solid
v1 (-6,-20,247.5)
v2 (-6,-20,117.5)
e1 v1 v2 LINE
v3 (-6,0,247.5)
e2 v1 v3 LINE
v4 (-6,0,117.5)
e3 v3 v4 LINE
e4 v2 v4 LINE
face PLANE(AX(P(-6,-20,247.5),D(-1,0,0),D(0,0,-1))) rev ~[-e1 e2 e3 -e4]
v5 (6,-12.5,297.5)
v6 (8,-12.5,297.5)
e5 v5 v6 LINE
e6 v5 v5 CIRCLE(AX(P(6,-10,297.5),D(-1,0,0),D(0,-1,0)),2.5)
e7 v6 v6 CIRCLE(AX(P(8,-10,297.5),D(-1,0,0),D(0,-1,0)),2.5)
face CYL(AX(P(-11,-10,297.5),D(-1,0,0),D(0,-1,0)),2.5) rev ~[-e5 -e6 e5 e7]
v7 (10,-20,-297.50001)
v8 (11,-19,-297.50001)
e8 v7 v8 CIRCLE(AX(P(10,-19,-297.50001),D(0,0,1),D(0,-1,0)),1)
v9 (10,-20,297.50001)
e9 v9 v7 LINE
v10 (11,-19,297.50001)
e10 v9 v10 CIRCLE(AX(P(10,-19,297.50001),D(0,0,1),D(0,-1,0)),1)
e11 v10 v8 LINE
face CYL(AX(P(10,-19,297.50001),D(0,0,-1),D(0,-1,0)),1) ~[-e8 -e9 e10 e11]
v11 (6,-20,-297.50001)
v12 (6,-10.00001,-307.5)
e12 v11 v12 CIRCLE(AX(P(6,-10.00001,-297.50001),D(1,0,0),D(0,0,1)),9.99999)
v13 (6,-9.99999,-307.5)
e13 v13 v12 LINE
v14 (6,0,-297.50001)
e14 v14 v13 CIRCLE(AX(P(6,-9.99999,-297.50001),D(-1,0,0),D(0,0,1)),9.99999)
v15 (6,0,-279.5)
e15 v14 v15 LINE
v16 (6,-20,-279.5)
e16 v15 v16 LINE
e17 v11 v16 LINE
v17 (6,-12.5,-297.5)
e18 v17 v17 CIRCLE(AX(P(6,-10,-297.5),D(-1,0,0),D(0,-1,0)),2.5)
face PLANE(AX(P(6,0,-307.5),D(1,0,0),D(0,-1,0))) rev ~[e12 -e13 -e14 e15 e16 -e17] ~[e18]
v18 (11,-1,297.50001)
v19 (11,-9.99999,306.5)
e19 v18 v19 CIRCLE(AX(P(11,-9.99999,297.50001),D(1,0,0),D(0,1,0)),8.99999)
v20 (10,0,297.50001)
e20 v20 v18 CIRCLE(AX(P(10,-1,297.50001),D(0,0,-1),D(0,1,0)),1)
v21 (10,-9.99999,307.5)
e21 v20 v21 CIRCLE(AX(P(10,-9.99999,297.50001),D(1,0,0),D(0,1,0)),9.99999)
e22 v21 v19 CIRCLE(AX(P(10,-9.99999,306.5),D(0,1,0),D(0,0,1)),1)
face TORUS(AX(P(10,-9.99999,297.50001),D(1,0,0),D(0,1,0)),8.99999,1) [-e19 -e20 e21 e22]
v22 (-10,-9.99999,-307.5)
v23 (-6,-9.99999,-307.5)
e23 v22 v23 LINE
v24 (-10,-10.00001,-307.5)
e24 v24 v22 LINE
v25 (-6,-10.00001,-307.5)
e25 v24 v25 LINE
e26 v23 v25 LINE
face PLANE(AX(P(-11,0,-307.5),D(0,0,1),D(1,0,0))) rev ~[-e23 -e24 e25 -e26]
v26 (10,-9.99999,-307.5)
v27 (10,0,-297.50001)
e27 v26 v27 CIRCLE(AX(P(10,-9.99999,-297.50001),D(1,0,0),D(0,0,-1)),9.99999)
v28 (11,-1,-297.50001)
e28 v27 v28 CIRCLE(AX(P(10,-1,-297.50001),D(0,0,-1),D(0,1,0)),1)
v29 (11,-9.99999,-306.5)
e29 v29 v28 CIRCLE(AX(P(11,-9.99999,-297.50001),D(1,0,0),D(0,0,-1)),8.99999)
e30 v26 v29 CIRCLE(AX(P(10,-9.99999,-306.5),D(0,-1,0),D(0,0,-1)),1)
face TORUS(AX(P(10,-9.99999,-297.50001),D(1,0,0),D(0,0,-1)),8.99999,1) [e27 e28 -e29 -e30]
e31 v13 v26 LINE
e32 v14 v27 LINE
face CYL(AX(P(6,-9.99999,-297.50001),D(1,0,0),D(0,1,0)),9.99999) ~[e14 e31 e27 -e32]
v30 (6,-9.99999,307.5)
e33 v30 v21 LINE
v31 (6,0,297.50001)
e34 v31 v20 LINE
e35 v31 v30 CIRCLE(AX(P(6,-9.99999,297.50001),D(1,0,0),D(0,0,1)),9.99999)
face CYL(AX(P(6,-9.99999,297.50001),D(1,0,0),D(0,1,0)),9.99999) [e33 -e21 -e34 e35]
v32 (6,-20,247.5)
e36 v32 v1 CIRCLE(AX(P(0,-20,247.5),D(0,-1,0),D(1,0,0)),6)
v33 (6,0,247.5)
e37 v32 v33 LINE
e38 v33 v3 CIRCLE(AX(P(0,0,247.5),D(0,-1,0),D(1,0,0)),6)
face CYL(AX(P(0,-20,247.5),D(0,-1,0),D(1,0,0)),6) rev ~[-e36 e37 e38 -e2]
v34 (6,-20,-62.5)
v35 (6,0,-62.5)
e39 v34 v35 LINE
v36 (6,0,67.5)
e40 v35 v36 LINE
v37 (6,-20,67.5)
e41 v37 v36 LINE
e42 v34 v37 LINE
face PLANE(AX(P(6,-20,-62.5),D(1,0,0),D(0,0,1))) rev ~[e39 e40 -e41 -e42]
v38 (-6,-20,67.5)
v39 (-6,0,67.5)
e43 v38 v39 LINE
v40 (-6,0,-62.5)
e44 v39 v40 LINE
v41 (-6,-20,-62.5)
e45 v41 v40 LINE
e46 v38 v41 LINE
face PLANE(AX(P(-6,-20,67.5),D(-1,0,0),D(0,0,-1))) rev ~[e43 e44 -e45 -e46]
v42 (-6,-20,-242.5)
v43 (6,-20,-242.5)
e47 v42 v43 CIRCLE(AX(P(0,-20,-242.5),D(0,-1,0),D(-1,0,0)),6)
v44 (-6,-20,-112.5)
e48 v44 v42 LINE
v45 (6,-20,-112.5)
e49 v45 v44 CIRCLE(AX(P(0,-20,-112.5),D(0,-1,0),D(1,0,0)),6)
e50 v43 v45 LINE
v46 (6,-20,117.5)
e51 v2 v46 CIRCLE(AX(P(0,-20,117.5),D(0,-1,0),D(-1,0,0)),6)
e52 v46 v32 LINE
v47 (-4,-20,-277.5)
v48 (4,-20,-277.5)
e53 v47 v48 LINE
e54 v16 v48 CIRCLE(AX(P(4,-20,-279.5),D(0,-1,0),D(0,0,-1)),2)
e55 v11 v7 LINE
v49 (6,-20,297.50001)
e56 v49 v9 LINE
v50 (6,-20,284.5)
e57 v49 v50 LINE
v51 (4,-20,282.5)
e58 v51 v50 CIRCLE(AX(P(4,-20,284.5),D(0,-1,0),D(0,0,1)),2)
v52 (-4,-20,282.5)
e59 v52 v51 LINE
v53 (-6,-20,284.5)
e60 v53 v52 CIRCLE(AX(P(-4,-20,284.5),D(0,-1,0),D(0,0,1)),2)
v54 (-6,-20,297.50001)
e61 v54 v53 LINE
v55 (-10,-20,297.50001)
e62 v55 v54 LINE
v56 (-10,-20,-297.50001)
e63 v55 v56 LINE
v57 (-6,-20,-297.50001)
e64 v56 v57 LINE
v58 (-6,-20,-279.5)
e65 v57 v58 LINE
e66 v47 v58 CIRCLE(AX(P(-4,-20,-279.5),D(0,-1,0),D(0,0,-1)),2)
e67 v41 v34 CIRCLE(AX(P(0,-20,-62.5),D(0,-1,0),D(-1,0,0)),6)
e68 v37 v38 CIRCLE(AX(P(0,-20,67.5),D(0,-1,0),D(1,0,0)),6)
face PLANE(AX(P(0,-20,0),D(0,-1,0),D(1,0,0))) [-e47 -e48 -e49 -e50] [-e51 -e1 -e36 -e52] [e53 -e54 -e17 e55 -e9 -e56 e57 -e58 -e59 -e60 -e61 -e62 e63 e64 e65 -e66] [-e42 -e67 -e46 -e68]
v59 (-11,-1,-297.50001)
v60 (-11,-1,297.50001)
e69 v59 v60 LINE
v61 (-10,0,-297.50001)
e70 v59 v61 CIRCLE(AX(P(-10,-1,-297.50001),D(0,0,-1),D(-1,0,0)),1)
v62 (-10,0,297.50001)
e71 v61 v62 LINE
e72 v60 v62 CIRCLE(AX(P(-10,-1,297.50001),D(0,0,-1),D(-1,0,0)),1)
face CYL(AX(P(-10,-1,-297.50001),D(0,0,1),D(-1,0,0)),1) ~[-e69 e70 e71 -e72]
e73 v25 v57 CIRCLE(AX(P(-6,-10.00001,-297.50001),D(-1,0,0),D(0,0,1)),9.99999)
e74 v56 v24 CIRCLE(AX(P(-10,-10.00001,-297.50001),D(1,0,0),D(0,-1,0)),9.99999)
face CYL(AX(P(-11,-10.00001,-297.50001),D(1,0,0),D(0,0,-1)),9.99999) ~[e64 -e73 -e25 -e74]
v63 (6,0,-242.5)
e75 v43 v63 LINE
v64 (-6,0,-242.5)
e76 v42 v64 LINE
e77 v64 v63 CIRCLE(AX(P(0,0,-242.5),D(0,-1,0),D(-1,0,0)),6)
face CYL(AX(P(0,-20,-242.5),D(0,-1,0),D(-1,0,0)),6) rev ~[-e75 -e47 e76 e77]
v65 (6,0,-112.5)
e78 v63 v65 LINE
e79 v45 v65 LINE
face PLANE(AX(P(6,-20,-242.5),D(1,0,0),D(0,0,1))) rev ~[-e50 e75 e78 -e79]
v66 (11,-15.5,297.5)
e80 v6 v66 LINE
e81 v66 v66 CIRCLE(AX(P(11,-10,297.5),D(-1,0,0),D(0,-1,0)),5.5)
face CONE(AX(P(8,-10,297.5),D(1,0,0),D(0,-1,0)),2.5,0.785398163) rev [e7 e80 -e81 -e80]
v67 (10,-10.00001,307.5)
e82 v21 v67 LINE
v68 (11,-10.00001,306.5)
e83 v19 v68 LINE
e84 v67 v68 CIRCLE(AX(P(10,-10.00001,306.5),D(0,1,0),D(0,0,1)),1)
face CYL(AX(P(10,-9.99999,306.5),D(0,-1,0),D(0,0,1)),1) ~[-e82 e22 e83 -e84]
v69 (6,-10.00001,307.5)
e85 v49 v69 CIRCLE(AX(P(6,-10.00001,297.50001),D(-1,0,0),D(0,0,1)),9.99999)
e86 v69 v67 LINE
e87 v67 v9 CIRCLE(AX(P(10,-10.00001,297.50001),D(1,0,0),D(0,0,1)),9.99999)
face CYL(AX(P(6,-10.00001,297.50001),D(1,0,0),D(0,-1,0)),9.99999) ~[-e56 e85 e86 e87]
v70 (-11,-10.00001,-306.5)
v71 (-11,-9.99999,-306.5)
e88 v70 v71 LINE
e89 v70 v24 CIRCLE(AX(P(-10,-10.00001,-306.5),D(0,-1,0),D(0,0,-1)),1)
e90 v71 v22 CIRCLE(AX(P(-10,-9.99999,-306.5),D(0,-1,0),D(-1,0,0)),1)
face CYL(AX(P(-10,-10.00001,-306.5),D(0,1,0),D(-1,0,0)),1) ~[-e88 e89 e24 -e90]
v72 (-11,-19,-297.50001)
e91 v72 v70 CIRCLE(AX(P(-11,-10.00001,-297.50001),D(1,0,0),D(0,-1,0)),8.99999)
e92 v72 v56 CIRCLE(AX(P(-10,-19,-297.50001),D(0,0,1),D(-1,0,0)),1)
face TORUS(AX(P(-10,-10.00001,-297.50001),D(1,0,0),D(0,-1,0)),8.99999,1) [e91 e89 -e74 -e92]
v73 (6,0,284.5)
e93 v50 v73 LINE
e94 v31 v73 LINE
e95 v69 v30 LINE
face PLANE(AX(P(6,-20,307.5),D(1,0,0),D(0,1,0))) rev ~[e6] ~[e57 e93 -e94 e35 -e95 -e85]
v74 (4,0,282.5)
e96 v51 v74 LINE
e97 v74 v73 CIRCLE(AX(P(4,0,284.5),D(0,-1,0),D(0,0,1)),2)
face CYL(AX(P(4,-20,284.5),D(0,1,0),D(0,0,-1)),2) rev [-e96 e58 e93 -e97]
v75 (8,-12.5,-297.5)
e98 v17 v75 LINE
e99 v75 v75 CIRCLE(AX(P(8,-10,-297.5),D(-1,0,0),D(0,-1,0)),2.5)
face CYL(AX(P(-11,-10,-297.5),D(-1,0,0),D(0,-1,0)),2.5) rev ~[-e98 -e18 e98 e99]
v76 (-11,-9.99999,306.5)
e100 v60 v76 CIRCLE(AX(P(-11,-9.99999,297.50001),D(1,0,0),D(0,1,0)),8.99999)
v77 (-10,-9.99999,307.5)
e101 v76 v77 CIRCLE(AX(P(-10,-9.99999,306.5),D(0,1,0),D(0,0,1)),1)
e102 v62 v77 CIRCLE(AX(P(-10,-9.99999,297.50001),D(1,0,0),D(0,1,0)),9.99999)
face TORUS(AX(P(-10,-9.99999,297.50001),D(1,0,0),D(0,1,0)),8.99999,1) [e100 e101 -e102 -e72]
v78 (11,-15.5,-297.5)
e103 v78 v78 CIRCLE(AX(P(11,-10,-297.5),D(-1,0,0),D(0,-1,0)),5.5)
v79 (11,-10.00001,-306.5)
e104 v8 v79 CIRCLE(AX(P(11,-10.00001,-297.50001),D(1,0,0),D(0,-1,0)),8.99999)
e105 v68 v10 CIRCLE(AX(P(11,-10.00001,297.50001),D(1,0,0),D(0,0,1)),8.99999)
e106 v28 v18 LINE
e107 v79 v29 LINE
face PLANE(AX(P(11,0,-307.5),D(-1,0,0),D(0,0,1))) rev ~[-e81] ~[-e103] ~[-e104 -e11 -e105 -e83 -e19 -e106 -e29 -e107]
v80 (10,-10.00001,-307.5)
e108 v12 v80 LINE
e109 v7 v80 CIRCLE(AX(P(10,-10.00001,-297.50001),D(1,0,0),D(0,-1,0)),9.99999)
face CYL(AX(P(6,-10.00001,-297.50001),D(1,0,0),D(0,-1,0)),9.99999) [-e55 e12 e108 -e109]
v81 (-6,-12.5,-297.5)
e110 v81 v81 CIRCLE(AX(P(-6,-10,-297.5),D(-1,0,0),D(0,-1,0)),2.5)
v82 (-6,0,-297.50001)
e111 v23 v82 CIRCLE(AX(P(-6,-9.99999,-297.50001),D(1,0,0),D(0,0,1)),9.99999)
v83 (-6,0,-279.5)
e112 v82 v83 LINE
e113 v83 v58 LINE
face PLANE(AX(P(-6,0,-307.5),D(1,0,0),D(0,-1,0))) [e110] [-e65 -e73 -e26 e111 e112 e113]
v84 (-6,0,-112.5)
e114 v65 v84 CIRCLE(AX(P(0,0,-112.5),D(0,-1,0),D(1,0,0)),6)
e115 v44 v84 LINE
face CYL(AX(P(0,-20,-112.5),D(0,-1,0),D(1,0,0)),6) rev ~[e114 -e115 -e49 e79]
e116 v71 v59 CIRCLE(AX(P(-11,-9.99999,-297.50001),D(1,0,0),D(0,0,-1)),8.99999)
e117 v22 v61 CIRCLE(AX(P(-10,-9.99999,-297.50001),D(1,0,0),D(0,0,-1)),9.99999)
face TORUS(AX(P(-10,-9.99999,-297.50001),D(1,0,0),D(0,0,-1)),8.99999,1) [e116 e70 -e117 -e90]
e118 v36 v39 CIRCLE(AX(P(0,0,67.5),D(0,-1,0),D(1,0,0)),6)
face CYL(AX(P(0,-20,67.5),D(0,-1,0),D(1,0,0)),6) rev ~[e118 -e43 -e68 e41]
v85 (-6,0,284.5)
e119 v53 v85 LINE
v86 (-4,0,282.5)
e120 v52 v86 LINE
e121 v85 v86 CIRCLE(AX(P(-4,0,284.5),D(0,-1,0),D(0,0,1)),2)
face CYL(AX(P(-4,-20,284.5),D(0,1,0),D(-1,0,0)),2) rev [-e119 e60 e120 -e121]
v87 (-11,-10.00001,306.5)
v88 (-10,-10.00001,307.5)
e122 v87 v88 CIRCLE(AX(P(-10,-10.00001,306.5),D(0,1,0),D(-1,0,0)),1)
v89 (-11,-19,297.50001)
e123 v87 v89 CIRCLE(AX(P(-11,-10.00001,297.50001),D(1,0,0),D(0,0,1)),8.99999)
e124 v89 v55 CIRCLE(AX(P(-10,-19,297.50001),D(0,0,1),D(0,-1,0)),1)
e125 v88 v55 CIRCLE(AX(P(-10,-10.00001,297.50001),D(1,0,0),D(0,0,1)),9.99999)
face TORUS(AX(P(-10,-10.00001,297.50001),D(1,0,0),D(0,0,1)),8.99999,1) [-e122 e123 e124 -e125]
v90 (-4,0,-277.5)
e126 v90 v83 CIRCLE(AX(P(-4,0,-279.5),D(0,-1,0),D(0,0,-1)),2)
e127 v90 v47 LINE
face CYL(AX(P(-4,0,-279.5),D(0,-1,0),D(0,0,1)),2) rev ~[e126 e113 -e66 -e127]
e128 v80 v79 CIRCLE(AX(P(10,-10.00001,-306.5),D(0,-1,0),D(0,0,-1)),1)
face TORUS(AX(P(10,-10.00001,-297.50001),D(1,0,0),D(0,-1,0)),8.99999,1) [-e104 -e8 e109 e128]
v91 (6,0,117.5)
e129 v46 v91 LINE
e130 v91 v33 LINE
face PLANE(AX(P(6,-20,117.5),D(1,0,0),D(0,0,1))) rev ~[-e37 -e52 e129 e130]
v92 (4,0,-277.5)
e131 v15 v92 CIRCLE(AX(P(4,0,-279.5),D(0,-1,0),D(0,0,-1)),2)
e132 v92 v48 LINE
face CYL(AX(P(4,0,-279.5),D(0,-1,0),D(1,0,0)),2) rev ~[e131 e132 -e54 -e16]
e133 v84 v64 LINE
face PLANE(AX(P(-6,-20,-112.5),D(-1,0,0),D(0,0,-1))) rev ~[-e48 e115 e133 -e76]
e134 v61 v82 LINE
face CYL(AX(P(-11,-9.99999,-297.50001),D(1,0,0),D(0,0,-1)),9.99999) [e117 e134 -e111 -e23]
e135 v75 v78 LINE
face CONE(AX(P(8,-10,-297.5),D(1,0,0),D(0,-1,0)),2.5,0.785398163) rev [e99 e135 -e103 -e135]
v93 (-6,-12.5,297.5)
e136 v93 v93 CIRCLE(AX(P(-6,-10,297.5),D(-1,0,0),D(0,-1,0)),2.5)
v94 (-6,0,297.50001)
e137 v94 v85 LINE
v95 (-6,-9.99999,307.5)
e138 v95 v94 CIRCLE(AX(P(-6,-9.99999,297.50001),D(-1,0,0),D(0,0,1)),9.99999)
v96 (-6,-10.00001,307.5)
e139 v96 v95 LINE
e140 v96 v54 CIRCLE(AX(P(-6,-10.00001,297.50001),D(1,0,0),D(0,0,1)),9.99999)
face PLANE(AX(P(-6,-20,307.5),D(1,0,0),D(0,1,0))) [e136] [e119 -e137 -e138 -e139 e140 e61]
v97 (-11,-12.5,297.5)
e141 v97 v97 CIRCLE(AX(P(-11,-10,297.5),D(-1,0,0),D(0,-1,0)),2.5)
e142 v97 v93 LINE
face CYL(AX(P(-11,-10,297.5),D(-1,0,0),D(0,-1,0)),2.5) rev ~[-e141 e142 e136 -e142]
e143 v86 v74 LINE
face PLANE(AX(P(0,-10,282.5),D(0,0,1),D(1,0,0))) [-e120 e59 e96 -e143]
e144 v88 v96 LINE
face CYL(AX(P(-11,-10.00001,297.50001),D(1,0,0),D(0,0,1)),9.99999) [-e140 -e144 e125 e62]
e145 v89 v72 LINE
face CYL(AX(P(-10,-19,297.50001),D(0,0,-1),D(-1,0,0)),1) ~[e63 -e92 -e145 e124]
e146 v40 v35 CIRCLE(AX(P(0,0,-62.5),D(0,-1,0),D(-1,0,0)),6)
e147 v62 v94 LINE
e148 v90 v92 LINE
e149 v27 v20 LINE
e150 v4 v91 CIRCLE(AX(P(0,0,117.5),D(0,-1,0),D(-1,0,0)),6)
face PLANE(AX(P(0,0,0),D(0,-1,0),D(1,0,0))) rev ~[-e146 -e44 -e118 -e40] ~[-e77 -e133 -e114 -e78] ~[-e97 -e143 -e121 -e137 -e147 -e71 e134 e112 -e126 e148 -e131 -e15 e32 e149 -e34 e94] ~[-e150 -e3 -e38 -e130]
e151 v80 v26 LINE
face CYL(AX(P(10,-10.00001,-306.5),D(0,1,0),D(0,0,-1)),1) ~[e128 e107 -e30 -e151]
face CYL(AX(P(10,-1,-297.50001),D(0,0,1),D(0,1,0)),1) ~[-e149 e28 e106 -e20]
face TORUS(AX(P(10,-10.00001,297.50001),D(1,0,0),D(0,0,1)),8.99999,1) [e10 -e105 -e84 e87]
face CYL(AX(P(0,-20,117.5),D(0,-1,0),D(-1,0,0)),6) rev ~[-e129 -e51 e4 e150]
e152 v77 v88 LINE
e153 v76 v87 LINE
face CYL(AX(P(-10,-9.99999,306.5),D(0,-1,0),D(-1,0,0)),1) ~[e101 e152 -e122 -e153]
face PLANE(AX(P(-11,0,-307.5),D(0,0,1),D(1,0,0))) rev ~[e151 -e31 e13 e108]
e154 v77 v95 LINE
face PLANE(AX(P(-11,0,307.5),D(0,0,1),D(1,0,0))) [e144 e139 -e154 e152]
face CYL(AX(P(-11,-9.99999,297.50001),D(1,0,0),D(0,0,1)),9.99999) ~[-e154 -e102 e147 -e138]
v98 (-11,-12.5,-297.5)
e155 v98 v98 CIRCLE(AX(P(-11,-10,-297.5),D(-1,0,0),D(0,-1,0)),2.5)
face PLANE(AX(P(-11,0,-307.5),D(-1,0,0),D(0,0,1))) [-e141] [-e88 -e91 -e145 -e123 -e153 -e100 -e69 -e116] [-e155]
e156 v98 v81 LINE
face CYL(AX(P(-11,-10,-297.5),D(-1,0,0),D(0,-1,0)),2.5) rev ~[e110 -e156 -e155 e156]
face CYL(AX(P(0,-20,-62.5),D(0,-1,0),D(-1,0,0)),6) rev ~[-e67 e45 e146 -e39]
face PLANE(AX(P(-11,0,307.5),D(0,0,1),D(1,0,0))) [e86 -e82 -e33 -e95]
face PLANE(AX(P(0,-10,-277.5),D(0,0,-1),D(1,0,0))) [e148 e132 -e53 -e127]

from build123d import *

# Parameters (mm, degrees)
F0_W      = 22
F0_H      = 615
F1_DEPTH  = 20
F2_W      = 12
F2_H      = 20
F3_DEPTH  = 25
F4_W      = 12
F4_H      = 20
F5_DEPTH  = 30
F6_R      = 9.99999
F7_R      = 2.5
F8_DEPTH  = 30
F10_DEPTH = 25
F11_R     = 1
F12_SIZE  = 3
F13_R     = 2


# Not quite as in the source:
# - a fillet or chamfer is up to 0.001 mm smaller than in the source, because OpenCascade refuses the exact size


with BuildPart() as f1:
    # F0 (on Front) → F1 (new body)
    with BuildSketch(Plane.XZ):
        Rectangle(F0_W, F0_H)
    extrude(amount=F1_DEPTH)

    # F2 (on face) → F3 (cut)
    with BuildSketch(Plane.XY.offset(307.5)):
        with Locations((0, -10)):
            Rectangle(F2_W, F2_H)
    extrude(amount=-F3_DEPTH, mode=Mode.SUBTRACT)

    # F4 (on face) → F5 (cut)
    with BuildSketch(Plane(origin=(0, 0, -307.5), x_dir=(1, 0, 0), z_dir=(0, 0, -1))):
        with Locations((0, 10)):
            Rectangle(F4_W, F4_H)
    extrude(amount=-F5_DEPTH, mode=Mode.SUBTRACT)

    # F6 (radius 10 in the source; OpenCascade refuses exactly that, so slightly less here)
    f6_edges = [f1.edges().sort_by_distance(p)[0] for p in [
        (-8.5, 0, -307.5),
        (8.5, 0, -307.5),
        (8.5, -20, -307.5),
        (-8.5, -20, -307.5),
        (-8.5, -20, 307.5),
        (-8.5, 0, 307.5),
        (8.5, 0, 307.5),
        (8.5, -20, 307.5),
    ]]
    fillet(f6_edges, radius=F6_R)

    # F7 (on face) → F8 (cut)
    with BuildSketch(Plane(origin=(-11, 0, 0), x_dir=(0, -1, 0), z_dir=(-1, 0, 0))):
        with Locations((10, 297.5)):
            Circle(F7_R)
        with Locations((10, -297.5)):
            Circle(F7_R)
    extrude(amount=-F8_DEPTH, mode=Mode.SUBTRACT)

    # F9 (on face) → F10 (cut)
    with BuildSketch(Plane.XZ.offset(20)):
        with BuildLine():
            ThreePointArc((6, 247.5), (0, 253.5), (-6, 247.5))
            Line((-6, 247.5), (-6, 117.5))
            ThreePointArc((-6, 117.5), (0, 111.5), (6, 117.5))
            Line((6, 117.5), (6, 247.5))
        make_face()
        with BuildLine():
            ThreePointArc((-6, -62.5), (0, -68.5), (6, -62.5))
            Line((6, -62.5), (6, 67.5))
            ThreePointArc((6, 67.5), (0, 73.5), (-6, 67.5))
            Line((-6, 67.5), (-6, -62.5))
        make_face()
        with BuildLine():
            Line((-6, -112.5), (-6, -242.5))
            ThreePointArc((-6, -242.5), (0, -248.5), (6, -242.5))
            Line((6, -242.5), (6, -112.5))
            ThreePointArc((6, -112.5), (0, -106.5), (-6, -112.5))
        make_face()
    extrude(amount=-F10_DEPTH, mode=Mode.SUBTRACT)

    # F11
    f11_edges = [f1.edges().sort_by_distance(p)[0] for p in [
        (11, 0, 0),
        (-11, 0, 0),
    ]]
    fillet(f11_edges, radius=F11_R)

    # F12
    f12_edges = [f1.edges().sort_by_distance(p)[0] for p in [
        (11, -7.5, 297.5),
        (11, -7.5, -297.5),
    ]]
    chamfer(f12_edges, length=F12_SIZE)

    # F13
    f13_edges = [f1.edges().sort_by_distance(p)[0] for p in [
        (-6, -10, -277.5),
        (6, -10, -277.5),
        (6, -10, 282.5),
        (-6, -10, 282.5),
    ]]
    fillet(f13_edges, radius=F13_R)


solid = f1.part
